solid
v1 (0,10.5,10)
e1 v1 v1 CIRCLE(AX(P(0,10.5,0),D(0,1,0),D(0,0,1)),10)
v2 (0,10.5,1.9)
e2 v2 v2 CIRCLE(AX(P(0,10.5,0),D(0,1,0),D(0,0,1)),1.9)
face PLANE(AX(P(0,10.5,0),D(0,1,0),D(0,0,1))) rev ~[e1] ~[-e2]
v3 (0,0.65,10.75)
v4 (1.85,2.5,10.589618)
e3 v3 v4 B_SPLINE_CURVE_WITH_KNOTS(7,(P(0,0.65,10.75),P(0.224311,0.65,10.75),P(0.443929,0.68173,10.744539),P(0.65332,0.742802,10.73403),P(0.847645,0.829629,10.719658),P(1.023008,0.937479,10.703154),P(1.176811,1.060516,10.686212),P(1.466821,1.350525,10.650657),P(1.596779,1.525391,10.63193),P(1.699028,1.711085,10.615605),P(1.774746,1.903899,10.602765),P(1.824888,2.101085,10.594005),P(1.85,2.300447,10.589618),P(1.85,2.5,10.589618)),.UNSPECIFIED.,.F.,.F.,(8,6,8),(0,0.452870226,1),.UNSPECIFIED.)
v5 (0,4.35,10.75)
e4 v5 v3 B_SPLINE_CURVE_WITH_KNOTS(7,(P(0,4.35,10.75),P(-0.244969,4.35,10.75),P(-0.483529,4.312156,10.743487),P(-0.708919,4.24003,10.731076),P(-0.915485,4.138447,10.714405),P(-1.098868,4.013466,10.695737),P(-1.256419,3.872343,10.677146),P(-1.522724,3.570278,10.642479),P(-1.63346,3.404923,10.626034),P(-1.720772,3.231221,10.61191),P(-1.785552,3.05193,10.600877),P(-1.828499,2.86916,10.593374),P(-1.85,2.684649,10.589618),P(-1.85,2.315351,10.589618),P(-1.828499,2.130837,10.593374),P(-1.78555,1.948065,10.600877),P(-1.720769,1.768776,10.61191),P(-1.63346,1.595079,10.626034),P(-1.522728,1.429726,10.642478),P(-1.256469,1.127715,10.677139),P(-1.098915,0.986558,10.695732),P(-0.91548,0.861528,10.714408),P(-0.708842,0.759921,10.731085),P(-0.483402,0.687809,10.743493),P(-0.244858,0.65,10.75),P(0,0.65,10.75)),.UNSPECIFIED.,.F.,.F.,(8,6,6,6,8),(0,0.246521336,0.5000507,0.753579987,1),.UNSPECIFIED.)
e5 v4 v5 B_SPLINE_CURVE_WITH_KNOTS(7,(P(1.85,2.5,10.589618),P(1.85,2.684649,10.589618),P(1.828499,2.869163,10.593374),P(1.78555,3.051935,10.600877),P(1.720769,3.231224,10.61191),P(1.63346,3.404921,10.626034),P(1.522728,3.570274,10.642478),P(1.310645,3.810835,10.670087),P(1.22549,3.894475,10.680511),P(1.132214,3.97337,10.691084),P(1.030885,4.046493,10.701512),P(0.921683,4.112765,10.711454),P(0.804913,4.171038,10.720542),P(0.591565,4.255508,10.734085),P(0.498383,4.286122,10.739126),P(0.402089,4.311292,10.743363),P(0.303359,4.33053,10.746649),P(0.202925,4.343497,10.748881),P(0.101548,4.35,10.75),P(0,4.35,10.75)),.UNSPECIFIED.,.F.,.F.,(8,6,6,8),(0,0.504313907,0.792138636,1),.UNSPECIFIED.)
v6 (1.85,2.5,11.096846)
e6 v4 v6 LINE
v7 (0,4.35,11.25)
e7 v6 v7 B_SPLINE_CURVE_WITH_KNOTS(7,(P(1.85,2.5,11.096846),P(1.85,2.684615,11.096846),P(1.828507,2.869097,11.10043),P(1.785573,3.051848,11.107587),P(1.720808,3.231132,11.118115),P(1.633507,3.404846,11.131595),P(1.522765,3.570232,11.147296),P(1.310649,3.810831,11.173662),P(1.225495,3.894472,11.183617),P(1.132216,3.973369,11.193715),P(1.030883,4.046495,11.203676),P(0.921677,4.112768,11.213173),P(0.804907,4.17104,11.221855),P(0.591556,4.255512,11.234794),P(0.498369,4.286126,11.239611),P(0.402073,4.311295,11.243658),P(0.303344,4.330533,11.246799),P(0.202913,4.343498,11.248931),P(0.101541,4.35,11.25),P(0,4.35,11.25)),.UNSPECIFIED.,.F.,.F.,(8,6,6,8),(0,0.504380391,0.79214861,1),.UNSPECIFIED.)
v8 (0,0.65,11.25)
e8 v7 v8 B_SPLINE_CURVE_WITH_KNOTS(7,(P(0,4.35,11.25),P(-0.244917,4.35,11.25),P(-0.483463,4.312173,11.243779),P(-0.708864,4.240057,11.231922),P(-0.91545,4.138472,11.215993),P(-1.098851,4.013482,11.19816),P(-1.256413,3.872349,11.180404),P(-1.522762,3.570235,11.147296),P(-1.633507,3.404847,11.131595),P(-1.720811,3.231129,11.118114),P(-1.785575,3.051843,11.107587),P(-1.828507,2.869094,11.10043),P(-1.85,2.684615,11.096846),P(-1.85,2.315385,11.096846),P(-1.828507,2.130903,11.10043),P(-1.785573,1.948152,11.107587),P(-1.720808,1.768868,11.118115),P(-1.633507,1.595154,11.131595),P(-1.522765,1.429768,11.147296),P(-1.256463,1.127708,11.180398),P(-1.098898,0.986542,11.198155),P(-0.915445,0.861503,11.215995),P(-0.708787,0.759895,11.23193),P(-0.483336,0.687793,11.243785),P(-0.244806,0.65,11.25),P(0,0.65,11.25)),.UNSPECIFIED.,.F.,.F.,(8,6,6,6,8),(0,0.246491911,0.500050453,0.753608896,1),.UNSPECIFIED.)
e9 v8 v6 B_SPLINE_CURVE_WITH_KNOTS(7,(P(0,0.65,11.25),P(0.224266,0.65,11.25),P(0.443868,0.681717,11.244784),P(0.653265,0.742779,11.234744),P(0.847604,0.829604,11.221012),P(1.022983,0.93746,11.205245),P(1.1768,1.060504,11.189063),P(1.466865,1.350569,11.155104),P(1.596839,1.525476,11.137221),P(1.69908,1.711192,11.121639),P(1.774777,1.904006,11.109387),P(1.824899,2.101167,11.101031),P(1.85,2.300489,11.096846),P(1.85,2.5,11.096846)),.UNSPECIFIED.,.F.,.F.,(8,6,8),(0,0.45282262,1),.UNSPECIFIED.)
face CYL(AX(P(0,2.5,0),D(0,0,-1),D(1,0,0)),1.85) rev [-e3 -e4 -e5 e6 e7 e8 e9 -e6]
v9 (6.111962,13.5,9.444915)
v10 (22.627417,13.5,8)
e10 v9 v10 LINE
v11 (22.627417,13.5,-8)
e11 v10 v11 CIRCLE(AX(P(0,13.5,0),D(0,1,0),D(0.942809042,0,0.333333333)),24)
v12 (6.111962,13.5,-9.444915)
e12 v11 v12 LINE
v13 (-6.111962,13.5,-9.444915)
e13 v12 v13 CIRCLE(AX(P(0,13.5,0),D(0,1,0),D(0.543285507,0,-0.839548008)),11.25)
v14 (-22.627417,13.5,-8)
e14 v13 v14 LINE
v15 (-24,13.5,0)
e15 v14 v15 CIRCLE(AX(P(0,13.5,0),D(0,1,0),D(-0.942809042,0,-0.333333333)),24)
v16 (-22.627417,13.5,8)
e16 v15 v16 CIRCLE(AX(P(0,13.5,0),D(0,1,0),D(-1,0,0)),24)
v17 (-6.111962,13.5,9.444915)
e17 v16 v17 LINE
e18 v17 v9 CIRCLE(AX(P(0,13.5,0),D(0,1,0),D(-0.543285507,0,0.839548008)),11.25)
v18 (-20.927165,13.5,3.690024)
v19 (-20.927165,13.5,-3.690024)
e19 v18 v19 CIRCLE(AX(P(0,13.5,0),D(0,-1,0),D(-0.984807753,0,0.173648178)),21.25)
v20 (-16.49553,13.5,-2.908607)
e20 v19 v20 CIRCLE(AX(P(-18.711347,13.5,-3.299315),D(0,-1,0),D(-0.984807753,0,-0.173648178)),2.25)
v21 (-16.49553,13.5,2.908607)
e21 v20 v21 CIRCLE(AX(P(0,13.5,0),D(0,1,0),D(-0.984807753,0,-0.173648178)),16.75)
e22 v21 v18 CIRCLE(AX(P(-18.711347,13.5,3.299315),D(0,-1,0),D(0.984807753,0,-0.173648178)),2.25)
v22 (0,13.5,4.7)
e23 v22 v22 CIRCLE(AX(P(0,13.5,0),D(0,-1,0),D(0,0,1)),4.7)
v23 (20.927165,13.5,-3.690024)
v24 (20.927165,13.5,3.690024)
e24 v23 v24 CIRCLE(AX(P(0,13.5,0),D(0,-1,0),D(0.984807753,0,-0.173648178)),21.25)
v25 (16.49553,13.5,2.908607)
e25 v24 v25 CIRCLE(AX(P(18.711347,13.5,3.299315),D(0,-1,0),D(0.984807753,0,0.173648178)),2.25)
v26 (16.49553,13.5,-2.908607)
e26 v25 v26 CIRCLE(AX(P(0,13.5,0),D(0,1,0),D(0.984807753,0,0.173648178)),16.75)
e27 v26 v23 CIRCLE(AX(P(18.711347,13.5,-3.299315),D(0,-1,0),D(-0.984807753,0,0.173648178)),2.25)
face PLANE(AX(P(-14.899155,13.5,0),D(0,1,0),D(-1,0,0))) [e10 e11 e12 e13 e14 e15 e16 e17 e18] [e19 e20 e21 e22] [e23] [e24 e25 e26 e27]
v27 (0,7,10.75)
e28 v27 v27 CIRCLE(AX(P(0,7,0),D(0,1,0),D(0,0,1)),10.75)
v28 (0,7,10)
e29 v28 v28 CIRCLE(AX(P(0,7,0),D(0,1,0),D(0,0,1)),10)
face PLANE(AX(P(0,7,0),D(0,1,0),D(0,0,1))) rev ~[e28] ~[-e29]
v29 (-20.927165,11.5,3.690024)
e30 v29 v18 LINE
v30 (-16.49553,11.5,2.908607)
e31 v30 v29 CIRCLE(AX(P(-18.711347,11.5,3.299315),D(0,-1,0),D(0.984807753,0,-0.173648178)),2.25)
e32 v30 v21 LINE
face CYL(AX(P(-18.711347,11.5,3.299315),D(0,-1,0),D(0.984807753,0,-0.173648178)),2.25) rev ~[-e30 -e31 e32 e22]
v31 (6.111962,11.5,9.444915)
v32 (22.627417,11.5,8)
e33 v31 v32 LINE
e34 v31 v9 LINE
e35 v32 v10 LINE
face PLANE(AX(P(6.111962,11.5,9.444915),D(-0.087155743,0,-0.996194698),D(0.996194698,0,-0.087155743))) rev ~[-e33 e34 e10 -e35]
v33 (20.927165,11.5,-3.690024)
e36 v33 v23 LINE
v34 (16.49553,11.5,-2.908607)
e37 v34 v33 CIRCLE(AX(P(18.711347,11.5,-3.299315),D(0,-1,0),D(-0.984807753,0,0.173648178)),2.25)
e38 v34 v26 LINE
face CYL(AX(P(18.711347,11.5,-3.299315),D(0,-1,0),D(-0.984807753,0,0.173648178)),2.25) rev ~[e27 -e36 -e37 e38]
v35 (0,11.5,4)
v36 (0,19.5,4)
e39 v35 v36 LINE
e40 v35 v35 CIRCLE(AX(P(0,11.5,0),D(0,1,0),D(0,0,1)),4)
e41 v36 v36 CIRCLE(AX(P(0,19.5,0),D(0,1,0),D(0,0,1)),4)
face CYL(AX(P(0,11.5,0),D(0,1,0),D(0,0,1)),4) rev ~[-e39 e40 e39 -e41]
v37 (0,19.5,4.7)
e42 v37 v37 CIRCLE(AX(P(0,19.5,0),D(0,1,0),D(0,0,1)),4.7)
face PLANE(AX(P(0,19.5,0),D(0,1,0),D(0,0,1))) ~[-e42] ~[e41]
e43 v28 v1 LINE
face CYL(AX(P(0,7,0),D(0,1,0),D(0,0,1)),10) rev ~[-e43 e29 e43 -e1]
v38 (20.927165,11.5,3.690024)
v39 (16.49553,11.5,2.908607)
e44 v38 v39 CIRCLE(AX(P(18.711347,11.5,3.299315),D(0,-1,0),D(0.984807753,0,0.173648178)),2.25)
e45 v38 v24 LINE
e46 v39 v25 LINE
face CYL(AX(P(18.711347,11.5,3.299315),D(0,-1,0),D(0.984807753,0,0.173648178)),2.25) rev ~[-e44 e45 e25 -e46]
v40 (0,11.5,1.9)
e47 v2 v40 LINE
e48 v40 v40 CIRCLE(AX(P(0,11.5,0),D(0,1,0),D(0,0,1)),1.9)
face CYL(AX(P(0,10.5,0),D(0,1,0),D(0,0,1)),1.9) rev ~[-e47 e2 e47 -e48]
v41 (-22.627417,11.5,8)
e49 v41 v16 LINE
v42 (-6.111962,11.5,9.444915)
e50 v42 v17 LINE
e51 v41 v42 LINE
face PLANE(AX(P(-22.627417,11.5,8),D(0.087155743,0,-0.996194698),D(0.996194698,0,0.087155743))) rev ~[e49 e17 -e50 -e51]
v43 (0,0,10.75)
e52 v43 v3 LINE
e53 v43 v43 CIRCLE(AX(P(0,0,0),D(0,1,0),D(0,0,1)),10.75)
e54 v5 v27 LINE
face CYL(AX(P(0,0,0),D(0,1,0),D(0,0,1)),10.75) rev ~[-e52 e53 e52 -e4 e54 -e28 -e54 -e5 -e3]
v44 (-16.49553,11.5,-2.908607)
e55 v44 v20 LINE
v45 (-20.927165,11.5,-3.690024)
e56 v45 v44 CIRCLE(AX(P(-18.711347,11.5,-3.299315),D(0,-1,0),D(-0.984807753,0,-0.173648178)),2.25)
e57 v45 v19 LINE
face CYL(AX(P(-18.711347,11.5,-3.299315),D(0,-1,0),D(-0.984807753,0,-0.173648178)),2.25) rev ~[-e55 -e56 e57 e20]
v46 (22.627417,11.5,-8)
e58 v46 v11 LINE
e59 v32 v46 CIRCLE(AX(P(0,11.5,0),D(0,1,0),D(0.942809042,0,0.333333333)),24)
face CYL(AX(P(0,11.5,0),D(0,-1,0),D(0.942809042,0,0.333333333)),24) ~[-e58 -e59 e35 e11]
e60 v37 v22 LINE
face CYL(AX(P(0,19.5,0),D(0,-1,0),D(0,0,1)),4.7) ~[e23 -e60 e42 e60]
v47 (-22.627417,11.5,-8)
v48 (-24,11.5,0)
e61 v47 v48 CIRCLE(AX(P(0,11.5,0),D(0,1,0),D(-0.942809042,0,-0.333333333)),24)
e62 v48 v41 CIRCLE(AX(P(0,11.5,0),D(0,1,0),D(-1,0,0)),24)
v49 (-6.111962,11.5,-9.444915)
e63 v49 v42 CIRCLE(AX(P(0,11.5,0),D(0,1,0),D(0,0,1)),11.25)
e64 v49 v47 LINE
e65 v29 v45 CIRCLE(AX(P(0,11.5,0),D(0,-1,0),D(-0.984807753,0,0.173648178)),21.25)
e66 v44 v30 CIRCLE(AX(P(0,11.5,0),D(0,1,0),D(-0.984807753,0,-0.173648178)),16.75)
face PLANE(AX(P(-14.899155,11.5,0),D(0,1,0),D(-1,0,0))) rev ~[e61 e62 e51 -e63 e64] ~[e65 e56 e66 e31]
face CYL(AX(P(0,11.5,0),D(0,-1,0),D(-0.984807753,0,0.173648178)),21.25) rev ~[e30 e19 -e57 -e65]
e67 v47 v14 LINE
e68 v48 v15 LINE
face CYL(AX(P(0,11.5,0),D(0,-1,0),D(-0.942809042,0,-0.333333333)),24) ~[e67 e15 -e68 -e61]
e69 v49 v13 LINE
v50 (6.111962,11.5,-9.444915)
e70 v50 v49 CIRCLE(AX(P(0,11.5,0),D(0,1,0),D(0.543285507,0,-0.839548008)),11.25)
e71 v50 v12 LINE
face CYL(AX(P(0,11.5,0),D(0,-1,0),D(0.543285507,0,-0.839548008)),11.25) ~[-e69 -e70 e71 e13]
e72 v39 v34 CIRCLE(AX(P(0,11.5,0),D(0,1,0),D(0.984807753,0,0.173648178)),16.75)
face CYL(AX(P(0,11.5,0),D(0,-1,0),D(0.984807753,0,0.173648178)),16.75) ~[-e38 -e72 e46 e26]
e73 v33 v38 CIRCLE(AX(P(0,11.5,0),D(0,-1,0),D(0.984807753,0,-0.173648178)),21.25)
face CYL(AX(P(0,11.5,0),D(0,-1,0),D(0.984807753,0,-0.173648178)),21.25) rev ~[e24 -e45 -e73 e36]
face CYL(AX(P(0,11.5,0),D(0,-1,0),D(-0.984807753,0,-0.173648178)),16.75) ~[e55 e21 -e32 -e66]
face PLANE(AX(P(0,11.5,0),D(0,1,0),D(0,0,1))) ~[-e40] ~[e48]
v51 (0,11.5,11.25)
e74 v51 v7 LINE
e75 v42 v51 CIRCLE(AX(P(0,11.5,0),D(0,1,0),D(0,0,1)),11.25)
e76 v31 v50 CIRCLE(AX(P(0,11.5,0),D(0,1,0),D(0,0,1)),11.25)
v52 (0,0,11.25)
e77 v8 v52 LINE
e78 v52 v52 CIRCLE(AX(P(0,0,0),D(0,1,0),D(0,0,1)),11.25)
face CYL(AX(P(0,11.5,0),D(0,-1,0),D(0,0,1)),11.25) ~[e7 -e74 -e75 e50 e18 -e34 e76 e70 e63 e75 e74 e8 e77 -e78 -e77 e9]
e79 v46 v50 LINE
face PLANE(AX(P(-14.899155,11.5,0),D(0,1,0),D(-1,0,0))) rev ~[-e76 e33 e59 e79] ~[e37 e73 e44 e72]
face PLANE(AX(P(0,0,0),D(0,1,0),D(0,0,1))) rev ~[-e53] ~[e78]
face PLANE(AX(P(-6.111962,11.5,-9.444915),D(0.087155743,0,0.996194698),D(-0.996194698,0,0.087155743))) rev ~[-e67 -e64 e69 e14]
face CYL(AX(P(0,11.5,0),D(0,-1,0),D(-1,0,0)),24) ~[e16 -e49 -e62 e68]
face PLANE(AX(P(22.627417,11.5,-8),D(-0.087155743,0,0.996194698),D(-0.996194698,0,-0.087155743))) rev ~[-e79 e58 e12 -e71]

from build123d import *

# Parameters (mm, degrees)
F2_R     = 1.85
F3_DEPTH = 11.251
F4_R     = 4.7
F5_DEPTH = 2


with BuildPart() as f1:
    # F0 (on Right) → F1 (revolve)
    with BuildSketch(Plane.YZ):
        Polygon((11.5, 11.25), (0, 11.25), (0, 10.75), (7, 10.75), (7, 10), (10.5, 10), (10.5, 1.9), (11.5, 1.9), (11.5, 4), (19.5, 4), (19.5, 4.7), (11.5, 4.7), align=None)
    revolve(axis=Axis((0, 13.454885222, 0), (0, 1, 0)))

    # F2 (on Top) → F3 (cut, through all)
    with BuildSketch(Plane.XY):
        with Locations((0, 2.5)):
            Circle(F2_R)
    extrude(amount=F3_DEPTH, mode=Mode.SUBTRACT)

    # F4 (on face) → F5 (join)
    with BuildSketch(Plane(origin=(0, 11.5, 0), x_dir=(-1, 0, 0), z_dir=(0, 1, 0))):
        with BuildLine():
            ThreePointArc((22.627416998, -8), (23.6543654317, -4.0584474894), (24, 0))
            ThreePointArc((24, 0), (23.6543654317, 4.0584474894), (22.627416998, 8))
            Line((22.627416998, 8), (6.1119619567, 9.4449150891))
            ThreePointArc((6.1119619567, 9.4449150891), (9.88235984, 5.3760081839), (11.25, 0))
            ThreePointArc((11.25, 0), (9.88235984, -5.3760081839), (6.1119619567, -9.4449150891))
            Line((6.1119619567, -9.4449150891), (22.627416998, -8))
        make_face()
        with BuildLine():
            ThreePointArc((16.495529863, 2.9086069759), (18.3206389075, 5.5151328199), (20.9271647515, 3.6900237754))
            ThreePointArc((20.9271647515, 3.6900237754), (21.25, 0), (20.9271647515, -3.6900237754))
            ThreePointArc((20.9271647515, -3.6900237754), (18.3206389075, -5.5151328199), (16.495529863, -2.9086069759))
            ThreePointArc((16.495529863, -2.9086069759), (16.75, 0), (16.495529863, 2.9086069759))
        make_face(mode=Mode.SUBTRACT)
        with BuildLine():
            Line((-6.1119619567, 9.4449150891), (-22.627416998, 8))
            ThreePointArc((-22.627416998, 8), (-24, 0), (-22.627416998, -8))
            Line((-22.627416998, -8), (-6.1119619567, -9.4449150891))
            ThreePointArc((-6.1119619567, -9.4449150891), (-11.25, 0), (-6.1119619567, 9.4449150891))
        make_face()
        with BuildLine():
            ThreePointArc((-16.495529863, -2.9086069759), (-18.3206389075, -5.5151328199), (-20.9271647515, -3.6900237754))
            ThreePointArc((-20.9271647515, -3.6900237754), (-21.25, 0), (-20.9271647515, 3.6900237754))
            ThreePointArc((-20.9271647515, 3.6900237754), (-18.3206389075, 5.5151328199), (-16.495529863, 2.9086069759))
            ThreePointArc((-16.495529863, 2.9086069759), (-16.75, 0), (-16.495529863, -2.9086069759))
        make_face(mode=Mode.SUBTRACT)
        with BuildLine():
            ThreePointArc((11.25, 0), (9.88235984, 5.3760081839), (6.1119619567, 9.4449150891))
            ThreePointArc((6.1119619567, 9.4449150891), (0, 11.25), (-6.1119619567, 9.4449150891))
            ThreePointArc((-6.1119619567, 9.4449150891), (-11.25, 0), (-6.1119619567, -9.4449150891))
            ThreePointArc((-6.1119619567, -9.4449150891), (0, -11.25), (6.1119619567, -9.4449150891))
            ThreePointArc((6.1119619567, -9.4449150891), (9.88235984, -5.3760081839), (11.25, 0))
        make_face()
        Circle(F4_R, mode=Mode.SUBTRACT)
    extrude(amount=F5_DEPTH)


solid = f1.part
